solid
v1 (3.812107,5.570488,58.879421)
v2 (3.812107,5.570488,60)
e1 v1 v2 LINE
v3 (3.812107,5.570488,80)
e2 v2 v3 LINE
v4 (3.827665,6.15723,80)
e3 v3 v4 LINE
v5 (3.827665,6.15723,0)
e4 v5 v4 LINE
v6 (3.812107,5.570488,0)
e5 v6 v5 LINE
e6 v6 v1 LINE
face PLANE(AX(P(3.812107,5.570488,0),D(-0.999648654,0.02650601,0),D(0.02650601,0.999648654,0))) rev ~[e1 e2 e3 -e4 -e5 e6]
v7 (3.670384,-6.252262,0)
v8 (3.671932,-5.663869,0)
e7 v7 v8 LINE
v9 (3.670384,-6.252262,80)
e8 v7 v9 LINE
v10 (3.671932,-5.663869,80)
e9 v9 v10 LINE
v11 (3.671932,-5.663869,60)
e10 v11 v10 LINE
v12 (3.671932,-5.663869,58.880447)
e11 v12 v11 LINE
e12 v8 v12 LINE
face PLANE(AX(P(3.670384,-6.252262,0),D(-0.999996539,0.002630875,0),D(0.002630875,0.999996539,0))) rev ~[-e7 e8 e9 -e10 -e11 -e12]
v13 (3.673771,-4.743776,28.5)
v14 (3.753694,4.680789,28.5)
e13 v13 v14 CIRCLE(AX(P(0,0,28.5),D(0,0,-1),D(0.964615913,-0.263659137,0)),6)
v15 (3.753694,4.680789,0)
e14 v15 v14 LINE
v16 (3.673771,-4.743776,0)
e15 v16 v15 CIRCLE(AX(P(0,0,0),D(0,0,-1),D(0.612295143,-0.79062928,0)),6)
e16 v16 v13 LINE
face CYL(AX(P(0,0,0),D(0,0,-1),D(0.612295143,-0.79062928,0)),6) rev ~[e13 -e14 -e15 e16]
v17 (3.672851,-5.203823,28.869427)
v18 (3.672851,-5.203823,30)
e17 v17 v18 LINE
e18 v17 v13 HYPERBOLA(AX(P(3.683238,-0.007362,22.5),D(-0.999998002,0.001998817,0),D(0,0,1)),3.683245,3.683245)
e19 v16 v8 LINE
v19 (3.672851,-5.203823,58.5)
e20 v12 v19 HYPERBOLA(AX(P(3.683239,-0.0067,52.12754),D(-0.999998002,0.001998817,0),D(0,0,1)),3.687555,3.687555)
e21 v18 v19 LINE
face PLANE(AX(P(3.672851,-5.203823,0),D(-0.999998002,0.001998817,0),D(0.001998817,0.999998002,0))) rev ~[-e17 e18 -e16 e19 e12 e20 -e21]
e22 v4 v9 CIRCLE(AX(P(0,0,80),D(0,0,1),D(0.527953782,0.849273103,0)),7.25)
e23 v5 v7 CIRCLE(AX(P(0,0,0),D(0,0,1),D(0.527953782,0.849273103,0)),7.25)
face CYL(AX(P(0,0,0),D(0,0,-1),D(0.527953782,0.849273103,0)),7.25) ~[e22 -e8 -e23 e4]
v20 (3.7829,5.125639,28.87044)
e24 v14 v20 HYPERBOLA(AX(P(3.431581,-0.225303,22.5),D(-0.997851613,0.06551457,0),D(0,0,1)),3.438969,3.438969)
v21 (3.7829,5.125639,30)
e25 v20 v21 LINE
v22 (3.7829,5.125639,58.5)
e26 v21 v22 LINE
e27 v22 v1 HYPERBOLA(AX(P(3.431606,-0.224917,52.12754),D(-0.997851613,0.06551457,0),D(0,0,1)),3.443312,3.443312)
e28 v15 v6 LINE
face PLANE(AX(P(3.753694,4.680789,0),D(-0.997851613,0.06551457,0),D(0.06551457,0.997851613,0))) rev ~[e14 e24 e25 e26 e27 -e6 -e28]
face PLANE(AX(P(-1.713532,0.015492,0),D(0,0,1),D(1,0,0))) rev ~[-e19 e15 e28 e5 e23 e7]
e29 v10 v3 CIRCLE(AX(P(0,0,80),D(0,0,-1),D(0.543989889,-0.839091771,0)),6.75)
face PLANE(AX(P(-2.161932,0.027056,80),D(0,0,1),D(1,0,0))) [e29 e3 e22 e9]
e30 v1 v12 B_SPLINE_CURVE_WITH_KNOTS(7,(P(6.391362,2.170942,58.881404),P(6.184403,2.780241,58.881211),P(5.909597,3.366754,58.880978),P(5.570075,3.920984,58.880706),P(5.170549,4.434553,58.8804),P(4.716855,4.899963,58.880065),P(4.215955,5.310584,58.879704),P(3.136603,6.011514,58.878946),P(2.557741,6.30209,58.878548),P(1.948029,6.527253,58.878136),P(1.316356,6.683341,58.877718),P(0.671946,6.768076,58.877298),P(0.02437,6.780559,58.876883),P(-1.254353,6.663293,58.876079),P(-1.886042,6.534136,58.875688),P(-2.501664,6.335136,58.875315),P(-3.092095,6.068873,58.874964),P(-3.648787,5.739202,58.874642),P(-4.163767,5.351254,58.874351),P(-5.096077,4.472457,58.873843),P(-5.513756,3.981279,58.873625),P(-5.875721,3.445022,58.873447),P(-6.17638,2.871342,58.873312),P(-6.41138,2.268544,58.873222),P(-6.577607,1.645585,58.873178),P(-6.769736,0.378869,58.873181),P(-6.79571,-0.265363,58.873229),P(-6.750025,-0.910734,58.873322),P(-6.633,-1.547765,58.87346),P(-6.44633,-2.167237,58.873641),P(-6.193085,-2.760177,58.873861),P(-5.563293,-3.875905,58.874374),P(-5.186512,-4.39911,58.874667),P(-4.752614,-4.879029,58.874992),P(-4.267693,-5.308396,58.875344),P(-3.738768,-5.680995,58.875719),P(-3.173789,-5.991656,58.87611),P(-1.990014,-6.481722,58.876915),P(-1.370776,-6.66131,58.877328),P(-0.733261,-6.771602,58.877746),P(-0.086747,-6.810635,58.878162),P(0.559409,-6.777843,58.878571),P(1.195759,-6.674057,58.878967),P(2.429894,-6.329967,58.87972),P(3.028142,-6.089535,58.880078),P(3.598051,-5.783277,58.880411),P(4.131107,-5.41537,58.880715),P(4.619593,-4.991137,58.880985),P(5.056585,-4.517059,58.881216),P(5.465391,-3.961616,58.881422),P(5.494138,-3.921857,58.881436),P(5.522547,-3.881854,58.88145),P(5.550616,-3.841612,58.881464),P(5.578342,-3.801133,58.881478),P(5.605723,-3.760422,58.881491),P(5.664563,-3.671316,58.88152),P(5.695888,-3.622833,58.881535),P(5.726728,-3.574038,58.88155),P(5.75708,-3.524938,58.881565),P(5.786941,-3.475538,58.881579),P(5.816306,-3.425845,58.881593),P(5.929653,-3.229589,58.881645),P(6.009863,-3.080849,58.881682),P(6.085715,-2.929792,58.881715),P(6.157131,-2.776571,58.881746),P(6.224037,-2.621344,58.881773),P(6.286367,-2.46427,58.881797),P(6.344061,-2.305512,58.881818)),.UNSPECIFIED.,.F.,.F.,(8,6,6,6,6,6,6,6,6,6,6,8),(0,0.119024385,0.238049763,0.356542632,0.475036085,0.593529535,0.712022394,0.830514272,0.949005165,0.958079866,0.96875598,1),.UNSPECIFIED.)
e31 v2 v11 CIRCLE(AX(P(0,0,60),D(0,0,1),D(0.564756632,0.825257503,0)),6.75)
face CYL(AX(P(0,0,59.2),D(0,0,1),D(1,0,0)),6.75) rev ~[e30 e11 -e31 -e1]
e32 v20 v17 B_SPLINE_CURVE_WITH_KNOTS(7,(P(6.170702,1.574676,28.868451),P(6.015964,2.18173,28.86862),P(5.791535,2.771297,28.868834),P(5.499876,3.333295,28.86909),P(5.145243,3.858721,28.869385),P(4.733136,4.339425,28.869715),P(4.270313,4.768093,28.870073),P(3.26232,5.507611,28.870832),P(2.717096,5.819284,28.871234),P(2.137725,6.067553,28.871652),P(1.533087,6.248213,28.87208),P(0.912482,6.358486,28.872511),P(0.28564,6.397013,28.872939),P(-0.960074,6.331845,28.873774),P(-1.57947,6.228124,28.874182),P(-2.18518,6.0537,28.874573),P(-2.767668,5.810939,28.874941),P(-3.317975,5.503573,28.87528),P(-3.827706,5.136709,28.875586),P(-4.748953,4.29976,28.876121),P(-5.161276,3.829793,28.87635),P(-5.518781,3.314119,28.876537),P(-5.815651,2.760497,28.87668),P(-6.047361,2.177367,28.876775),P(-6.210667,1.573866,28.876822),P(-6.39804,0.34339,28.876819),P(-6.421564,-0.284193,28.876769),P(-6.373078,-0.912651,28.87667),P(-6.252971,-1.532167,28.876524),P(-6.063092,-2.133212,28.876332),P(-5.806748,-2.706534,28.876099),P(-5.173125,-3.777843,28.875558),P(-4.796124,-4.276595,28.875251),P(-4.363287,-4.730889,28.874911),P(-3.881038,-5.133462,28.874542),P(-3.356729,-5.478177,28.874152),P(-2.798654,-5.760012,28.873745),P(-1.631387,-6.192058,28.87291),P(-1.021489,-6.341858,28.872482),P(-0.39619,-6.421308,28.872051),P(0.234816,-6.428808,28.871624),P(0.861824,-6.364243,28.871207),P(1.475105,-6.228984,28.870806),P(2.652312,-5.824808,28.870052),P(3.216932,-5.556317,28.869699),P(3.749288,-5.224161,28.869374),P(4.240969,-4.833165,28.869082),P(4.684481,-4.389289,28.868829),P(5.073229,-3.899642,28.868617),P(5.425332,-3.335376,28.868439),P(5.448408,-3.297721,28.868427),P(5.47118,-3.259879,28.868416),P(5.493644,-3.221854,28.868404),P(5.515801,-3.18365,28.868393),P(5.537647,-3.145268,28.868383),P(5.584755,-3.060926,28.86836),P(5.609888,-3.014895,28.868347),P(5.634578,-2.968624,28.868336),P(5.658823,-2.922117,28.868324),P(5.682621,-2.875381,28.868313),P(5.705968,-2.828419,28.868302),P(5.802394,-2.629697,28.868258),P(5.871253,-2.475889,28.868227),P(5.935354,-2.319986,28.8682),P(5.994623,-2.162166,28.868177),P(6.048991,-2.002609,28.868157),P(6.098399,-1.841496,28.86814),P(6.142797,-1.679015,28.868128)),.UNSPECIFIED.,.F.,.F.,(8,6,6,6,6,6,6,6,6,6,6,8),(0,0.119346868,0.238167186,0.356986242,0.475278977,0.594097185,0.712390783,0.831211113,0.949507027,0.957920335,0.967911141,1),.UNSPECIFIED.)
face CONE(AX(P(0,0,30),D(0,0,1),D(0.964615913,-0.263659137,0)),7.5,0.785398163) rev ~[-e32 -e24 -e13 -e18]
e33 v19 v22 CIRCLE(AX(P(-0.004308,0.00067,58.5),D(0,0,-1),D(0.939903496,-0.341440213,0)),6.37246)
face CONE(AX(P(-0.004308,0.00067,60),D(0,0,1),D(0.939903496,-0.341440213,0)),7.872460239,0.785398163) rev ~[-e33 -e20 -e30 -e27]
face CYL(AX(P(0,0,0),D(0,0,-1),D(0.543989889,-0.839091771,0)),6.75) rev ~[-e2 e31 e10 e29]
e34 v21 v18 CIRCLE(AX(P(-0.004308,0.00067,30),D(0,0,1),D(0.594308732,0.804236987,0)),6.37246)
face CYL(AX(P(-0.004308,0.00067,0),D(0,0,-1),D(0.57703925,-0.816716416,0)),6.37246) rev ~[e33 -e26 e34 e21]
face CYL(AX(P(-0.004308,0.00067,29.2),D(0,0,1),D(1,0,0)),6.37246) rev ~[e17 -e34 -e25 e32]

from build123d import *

# Parameters (mm, degrees)
F1_DEPTH     = 80
F2_DEPTH     = 60
F3_DEPTH     = 30
F4_T4_ANGLE  = 321.2915133738
F4_S5_R      = 6.75
F4_T6_DEPTH  = 13
F4_T10_ANGLE = 330.397154177
F4_S11_R     = 6.3724602388
F4_T12_DEPTH = 12


# Not quite as in the source:
# - a fillet or chamfer that OpenCascade refuses, or shapes differently, is made with other operations: its cross-section is extruded or revolved along the edge and cut away or added


with BuildPart() as f1:
    # F0 (on Top) → F1 (new body)
    with BuildSketch(Plane.XY):
        with BuildLine():
            ThreePointArc((3.6719317522, -5.6638694553), (-6.7494746232, 0.0842158591), (3.8121072666, 5.5704881463))
            Line((3.8121072666, 5.5704881463), (3.8276649179, 6.1572300003))
            ThreePointArc((3.8276649179, 6.1572300003), (-7.2494177613, 0.091881022), (3.6703837587, -6.2522622357))
            Line((3.6703837587, -6.2522622357), (3.6719317522, -5.6638694553))
        make_face()
    extrude(amount=F1_DEPTH)

    # F0 (on Top) → F2 (join)
    with BuildSketch(Plane.XY):
        with BuildLine():
            Line((3.7829003883, 5.1256385395), (3.8121072666, 5.5704881463))
            ThreePointArc((3.8121072666, 5.5704881463), (-6.7494746232, 0.0842158591), (3.6719317522, -5.6638694553))
            Line((3.6719317522, -5.6638694553), (3.6728513037, -5.2038225677))
            ThreePointArc((3.6728513037, -5.2038225677), (-6.3764069894, 0.0685580429), (3.7829003883, 5.1256385395))
        make_face()
    extrude(amount=F2_DEPTH)

    # F0 (on Top) → F3 (join)
    with BuildSketch(Plane.XY):
        with BuildLine():
            Line((3.75369351, 4.6807889327), (3.7829003883, 5.1256385395))
            ThreePointArc((3.7829003883, 5.1256385395), (-6.3764069894, 0.0685580429), (3.6728513037, -5.2038225677))
            Line((3.6728513037, -5.2038225677), (3.6737708552, -4.7437756801))
            ThreePointArc((3.6737708552, -4.7437756801), (-5.9997842678, 0.0508796647), (3.75369351, 4.6807889327))
        make_face()
    extrude(amount=F3_DEPTH)

    # F4: chamfer of 1.5 on 2 edges, made by hand


with BuildPart() as f4_tool2:
    # F4_s3 → F4_t4 (revolve)
    with BuildSketch(Plane(origin=(-0.0002871576, -0.0007904765, 0), x_dir=(0, 0, 1), z_dir=(0.341440213, 0.9399034955, 0))):
        Polygon((60, 7.8681819087), (58.5, 6.3681819087), (60, 6.3681819087), align=None)
    revolve(axis=Axis((-0.004308375, 0.0006703174, 60), (0, 0, -1)), revolution_arc=F4_T4_ANGLE)

    # F4_s5 → F4_t6 (intersect, symmetric)
    with BuildSketch(Plane.XY.offset(59.2)):
        Circle(F4_S5_R)
    extrude(amount=F4_T6_DEPTH, both=True, mode=Mode.INTERSECT)


with BuildPart() as f1_1:
    add(f1.part)

    # F4_t1: cut F4_tool2
    add(f4_tool2.part, mode=Mode.SUBTRACT)


with BuildPart() as f4_tool8:
    # F4_s9 → F4_t10 (revolve)
    with BuildSketch(Plane(origin=(0, 0, 0), x_dir=(0, 0, 1), z_dir=(0.2636591374, 0.9646159128, 0))):
        Polygon((30, 7.5), (28.5, 6), (30, 6), align=None)
    revolve(axis=Axis((0, 0, 30), (0, 0, -1)), revolution_arc=F4_T10_ANGLE)

    # F4_s11 → F4_t12 (intersect, symmetric)
    with BuildSketch(Plane.XY.offset(29.2)):
        with Locations((-0.004308375, 0.0006703174)):
            Circle(F4_S11_R)
    extrude(amount=F4_T12_DEPTH, both=True, mode=Mode.INTERSECT)


with BuildPart() as f1_2:
    add(f1_1.part)

    # F4_t7: cut F4_tool8
    add(f4_tool8.part, mode=Mode.SUBTRACT)


solid = f1_2.part
